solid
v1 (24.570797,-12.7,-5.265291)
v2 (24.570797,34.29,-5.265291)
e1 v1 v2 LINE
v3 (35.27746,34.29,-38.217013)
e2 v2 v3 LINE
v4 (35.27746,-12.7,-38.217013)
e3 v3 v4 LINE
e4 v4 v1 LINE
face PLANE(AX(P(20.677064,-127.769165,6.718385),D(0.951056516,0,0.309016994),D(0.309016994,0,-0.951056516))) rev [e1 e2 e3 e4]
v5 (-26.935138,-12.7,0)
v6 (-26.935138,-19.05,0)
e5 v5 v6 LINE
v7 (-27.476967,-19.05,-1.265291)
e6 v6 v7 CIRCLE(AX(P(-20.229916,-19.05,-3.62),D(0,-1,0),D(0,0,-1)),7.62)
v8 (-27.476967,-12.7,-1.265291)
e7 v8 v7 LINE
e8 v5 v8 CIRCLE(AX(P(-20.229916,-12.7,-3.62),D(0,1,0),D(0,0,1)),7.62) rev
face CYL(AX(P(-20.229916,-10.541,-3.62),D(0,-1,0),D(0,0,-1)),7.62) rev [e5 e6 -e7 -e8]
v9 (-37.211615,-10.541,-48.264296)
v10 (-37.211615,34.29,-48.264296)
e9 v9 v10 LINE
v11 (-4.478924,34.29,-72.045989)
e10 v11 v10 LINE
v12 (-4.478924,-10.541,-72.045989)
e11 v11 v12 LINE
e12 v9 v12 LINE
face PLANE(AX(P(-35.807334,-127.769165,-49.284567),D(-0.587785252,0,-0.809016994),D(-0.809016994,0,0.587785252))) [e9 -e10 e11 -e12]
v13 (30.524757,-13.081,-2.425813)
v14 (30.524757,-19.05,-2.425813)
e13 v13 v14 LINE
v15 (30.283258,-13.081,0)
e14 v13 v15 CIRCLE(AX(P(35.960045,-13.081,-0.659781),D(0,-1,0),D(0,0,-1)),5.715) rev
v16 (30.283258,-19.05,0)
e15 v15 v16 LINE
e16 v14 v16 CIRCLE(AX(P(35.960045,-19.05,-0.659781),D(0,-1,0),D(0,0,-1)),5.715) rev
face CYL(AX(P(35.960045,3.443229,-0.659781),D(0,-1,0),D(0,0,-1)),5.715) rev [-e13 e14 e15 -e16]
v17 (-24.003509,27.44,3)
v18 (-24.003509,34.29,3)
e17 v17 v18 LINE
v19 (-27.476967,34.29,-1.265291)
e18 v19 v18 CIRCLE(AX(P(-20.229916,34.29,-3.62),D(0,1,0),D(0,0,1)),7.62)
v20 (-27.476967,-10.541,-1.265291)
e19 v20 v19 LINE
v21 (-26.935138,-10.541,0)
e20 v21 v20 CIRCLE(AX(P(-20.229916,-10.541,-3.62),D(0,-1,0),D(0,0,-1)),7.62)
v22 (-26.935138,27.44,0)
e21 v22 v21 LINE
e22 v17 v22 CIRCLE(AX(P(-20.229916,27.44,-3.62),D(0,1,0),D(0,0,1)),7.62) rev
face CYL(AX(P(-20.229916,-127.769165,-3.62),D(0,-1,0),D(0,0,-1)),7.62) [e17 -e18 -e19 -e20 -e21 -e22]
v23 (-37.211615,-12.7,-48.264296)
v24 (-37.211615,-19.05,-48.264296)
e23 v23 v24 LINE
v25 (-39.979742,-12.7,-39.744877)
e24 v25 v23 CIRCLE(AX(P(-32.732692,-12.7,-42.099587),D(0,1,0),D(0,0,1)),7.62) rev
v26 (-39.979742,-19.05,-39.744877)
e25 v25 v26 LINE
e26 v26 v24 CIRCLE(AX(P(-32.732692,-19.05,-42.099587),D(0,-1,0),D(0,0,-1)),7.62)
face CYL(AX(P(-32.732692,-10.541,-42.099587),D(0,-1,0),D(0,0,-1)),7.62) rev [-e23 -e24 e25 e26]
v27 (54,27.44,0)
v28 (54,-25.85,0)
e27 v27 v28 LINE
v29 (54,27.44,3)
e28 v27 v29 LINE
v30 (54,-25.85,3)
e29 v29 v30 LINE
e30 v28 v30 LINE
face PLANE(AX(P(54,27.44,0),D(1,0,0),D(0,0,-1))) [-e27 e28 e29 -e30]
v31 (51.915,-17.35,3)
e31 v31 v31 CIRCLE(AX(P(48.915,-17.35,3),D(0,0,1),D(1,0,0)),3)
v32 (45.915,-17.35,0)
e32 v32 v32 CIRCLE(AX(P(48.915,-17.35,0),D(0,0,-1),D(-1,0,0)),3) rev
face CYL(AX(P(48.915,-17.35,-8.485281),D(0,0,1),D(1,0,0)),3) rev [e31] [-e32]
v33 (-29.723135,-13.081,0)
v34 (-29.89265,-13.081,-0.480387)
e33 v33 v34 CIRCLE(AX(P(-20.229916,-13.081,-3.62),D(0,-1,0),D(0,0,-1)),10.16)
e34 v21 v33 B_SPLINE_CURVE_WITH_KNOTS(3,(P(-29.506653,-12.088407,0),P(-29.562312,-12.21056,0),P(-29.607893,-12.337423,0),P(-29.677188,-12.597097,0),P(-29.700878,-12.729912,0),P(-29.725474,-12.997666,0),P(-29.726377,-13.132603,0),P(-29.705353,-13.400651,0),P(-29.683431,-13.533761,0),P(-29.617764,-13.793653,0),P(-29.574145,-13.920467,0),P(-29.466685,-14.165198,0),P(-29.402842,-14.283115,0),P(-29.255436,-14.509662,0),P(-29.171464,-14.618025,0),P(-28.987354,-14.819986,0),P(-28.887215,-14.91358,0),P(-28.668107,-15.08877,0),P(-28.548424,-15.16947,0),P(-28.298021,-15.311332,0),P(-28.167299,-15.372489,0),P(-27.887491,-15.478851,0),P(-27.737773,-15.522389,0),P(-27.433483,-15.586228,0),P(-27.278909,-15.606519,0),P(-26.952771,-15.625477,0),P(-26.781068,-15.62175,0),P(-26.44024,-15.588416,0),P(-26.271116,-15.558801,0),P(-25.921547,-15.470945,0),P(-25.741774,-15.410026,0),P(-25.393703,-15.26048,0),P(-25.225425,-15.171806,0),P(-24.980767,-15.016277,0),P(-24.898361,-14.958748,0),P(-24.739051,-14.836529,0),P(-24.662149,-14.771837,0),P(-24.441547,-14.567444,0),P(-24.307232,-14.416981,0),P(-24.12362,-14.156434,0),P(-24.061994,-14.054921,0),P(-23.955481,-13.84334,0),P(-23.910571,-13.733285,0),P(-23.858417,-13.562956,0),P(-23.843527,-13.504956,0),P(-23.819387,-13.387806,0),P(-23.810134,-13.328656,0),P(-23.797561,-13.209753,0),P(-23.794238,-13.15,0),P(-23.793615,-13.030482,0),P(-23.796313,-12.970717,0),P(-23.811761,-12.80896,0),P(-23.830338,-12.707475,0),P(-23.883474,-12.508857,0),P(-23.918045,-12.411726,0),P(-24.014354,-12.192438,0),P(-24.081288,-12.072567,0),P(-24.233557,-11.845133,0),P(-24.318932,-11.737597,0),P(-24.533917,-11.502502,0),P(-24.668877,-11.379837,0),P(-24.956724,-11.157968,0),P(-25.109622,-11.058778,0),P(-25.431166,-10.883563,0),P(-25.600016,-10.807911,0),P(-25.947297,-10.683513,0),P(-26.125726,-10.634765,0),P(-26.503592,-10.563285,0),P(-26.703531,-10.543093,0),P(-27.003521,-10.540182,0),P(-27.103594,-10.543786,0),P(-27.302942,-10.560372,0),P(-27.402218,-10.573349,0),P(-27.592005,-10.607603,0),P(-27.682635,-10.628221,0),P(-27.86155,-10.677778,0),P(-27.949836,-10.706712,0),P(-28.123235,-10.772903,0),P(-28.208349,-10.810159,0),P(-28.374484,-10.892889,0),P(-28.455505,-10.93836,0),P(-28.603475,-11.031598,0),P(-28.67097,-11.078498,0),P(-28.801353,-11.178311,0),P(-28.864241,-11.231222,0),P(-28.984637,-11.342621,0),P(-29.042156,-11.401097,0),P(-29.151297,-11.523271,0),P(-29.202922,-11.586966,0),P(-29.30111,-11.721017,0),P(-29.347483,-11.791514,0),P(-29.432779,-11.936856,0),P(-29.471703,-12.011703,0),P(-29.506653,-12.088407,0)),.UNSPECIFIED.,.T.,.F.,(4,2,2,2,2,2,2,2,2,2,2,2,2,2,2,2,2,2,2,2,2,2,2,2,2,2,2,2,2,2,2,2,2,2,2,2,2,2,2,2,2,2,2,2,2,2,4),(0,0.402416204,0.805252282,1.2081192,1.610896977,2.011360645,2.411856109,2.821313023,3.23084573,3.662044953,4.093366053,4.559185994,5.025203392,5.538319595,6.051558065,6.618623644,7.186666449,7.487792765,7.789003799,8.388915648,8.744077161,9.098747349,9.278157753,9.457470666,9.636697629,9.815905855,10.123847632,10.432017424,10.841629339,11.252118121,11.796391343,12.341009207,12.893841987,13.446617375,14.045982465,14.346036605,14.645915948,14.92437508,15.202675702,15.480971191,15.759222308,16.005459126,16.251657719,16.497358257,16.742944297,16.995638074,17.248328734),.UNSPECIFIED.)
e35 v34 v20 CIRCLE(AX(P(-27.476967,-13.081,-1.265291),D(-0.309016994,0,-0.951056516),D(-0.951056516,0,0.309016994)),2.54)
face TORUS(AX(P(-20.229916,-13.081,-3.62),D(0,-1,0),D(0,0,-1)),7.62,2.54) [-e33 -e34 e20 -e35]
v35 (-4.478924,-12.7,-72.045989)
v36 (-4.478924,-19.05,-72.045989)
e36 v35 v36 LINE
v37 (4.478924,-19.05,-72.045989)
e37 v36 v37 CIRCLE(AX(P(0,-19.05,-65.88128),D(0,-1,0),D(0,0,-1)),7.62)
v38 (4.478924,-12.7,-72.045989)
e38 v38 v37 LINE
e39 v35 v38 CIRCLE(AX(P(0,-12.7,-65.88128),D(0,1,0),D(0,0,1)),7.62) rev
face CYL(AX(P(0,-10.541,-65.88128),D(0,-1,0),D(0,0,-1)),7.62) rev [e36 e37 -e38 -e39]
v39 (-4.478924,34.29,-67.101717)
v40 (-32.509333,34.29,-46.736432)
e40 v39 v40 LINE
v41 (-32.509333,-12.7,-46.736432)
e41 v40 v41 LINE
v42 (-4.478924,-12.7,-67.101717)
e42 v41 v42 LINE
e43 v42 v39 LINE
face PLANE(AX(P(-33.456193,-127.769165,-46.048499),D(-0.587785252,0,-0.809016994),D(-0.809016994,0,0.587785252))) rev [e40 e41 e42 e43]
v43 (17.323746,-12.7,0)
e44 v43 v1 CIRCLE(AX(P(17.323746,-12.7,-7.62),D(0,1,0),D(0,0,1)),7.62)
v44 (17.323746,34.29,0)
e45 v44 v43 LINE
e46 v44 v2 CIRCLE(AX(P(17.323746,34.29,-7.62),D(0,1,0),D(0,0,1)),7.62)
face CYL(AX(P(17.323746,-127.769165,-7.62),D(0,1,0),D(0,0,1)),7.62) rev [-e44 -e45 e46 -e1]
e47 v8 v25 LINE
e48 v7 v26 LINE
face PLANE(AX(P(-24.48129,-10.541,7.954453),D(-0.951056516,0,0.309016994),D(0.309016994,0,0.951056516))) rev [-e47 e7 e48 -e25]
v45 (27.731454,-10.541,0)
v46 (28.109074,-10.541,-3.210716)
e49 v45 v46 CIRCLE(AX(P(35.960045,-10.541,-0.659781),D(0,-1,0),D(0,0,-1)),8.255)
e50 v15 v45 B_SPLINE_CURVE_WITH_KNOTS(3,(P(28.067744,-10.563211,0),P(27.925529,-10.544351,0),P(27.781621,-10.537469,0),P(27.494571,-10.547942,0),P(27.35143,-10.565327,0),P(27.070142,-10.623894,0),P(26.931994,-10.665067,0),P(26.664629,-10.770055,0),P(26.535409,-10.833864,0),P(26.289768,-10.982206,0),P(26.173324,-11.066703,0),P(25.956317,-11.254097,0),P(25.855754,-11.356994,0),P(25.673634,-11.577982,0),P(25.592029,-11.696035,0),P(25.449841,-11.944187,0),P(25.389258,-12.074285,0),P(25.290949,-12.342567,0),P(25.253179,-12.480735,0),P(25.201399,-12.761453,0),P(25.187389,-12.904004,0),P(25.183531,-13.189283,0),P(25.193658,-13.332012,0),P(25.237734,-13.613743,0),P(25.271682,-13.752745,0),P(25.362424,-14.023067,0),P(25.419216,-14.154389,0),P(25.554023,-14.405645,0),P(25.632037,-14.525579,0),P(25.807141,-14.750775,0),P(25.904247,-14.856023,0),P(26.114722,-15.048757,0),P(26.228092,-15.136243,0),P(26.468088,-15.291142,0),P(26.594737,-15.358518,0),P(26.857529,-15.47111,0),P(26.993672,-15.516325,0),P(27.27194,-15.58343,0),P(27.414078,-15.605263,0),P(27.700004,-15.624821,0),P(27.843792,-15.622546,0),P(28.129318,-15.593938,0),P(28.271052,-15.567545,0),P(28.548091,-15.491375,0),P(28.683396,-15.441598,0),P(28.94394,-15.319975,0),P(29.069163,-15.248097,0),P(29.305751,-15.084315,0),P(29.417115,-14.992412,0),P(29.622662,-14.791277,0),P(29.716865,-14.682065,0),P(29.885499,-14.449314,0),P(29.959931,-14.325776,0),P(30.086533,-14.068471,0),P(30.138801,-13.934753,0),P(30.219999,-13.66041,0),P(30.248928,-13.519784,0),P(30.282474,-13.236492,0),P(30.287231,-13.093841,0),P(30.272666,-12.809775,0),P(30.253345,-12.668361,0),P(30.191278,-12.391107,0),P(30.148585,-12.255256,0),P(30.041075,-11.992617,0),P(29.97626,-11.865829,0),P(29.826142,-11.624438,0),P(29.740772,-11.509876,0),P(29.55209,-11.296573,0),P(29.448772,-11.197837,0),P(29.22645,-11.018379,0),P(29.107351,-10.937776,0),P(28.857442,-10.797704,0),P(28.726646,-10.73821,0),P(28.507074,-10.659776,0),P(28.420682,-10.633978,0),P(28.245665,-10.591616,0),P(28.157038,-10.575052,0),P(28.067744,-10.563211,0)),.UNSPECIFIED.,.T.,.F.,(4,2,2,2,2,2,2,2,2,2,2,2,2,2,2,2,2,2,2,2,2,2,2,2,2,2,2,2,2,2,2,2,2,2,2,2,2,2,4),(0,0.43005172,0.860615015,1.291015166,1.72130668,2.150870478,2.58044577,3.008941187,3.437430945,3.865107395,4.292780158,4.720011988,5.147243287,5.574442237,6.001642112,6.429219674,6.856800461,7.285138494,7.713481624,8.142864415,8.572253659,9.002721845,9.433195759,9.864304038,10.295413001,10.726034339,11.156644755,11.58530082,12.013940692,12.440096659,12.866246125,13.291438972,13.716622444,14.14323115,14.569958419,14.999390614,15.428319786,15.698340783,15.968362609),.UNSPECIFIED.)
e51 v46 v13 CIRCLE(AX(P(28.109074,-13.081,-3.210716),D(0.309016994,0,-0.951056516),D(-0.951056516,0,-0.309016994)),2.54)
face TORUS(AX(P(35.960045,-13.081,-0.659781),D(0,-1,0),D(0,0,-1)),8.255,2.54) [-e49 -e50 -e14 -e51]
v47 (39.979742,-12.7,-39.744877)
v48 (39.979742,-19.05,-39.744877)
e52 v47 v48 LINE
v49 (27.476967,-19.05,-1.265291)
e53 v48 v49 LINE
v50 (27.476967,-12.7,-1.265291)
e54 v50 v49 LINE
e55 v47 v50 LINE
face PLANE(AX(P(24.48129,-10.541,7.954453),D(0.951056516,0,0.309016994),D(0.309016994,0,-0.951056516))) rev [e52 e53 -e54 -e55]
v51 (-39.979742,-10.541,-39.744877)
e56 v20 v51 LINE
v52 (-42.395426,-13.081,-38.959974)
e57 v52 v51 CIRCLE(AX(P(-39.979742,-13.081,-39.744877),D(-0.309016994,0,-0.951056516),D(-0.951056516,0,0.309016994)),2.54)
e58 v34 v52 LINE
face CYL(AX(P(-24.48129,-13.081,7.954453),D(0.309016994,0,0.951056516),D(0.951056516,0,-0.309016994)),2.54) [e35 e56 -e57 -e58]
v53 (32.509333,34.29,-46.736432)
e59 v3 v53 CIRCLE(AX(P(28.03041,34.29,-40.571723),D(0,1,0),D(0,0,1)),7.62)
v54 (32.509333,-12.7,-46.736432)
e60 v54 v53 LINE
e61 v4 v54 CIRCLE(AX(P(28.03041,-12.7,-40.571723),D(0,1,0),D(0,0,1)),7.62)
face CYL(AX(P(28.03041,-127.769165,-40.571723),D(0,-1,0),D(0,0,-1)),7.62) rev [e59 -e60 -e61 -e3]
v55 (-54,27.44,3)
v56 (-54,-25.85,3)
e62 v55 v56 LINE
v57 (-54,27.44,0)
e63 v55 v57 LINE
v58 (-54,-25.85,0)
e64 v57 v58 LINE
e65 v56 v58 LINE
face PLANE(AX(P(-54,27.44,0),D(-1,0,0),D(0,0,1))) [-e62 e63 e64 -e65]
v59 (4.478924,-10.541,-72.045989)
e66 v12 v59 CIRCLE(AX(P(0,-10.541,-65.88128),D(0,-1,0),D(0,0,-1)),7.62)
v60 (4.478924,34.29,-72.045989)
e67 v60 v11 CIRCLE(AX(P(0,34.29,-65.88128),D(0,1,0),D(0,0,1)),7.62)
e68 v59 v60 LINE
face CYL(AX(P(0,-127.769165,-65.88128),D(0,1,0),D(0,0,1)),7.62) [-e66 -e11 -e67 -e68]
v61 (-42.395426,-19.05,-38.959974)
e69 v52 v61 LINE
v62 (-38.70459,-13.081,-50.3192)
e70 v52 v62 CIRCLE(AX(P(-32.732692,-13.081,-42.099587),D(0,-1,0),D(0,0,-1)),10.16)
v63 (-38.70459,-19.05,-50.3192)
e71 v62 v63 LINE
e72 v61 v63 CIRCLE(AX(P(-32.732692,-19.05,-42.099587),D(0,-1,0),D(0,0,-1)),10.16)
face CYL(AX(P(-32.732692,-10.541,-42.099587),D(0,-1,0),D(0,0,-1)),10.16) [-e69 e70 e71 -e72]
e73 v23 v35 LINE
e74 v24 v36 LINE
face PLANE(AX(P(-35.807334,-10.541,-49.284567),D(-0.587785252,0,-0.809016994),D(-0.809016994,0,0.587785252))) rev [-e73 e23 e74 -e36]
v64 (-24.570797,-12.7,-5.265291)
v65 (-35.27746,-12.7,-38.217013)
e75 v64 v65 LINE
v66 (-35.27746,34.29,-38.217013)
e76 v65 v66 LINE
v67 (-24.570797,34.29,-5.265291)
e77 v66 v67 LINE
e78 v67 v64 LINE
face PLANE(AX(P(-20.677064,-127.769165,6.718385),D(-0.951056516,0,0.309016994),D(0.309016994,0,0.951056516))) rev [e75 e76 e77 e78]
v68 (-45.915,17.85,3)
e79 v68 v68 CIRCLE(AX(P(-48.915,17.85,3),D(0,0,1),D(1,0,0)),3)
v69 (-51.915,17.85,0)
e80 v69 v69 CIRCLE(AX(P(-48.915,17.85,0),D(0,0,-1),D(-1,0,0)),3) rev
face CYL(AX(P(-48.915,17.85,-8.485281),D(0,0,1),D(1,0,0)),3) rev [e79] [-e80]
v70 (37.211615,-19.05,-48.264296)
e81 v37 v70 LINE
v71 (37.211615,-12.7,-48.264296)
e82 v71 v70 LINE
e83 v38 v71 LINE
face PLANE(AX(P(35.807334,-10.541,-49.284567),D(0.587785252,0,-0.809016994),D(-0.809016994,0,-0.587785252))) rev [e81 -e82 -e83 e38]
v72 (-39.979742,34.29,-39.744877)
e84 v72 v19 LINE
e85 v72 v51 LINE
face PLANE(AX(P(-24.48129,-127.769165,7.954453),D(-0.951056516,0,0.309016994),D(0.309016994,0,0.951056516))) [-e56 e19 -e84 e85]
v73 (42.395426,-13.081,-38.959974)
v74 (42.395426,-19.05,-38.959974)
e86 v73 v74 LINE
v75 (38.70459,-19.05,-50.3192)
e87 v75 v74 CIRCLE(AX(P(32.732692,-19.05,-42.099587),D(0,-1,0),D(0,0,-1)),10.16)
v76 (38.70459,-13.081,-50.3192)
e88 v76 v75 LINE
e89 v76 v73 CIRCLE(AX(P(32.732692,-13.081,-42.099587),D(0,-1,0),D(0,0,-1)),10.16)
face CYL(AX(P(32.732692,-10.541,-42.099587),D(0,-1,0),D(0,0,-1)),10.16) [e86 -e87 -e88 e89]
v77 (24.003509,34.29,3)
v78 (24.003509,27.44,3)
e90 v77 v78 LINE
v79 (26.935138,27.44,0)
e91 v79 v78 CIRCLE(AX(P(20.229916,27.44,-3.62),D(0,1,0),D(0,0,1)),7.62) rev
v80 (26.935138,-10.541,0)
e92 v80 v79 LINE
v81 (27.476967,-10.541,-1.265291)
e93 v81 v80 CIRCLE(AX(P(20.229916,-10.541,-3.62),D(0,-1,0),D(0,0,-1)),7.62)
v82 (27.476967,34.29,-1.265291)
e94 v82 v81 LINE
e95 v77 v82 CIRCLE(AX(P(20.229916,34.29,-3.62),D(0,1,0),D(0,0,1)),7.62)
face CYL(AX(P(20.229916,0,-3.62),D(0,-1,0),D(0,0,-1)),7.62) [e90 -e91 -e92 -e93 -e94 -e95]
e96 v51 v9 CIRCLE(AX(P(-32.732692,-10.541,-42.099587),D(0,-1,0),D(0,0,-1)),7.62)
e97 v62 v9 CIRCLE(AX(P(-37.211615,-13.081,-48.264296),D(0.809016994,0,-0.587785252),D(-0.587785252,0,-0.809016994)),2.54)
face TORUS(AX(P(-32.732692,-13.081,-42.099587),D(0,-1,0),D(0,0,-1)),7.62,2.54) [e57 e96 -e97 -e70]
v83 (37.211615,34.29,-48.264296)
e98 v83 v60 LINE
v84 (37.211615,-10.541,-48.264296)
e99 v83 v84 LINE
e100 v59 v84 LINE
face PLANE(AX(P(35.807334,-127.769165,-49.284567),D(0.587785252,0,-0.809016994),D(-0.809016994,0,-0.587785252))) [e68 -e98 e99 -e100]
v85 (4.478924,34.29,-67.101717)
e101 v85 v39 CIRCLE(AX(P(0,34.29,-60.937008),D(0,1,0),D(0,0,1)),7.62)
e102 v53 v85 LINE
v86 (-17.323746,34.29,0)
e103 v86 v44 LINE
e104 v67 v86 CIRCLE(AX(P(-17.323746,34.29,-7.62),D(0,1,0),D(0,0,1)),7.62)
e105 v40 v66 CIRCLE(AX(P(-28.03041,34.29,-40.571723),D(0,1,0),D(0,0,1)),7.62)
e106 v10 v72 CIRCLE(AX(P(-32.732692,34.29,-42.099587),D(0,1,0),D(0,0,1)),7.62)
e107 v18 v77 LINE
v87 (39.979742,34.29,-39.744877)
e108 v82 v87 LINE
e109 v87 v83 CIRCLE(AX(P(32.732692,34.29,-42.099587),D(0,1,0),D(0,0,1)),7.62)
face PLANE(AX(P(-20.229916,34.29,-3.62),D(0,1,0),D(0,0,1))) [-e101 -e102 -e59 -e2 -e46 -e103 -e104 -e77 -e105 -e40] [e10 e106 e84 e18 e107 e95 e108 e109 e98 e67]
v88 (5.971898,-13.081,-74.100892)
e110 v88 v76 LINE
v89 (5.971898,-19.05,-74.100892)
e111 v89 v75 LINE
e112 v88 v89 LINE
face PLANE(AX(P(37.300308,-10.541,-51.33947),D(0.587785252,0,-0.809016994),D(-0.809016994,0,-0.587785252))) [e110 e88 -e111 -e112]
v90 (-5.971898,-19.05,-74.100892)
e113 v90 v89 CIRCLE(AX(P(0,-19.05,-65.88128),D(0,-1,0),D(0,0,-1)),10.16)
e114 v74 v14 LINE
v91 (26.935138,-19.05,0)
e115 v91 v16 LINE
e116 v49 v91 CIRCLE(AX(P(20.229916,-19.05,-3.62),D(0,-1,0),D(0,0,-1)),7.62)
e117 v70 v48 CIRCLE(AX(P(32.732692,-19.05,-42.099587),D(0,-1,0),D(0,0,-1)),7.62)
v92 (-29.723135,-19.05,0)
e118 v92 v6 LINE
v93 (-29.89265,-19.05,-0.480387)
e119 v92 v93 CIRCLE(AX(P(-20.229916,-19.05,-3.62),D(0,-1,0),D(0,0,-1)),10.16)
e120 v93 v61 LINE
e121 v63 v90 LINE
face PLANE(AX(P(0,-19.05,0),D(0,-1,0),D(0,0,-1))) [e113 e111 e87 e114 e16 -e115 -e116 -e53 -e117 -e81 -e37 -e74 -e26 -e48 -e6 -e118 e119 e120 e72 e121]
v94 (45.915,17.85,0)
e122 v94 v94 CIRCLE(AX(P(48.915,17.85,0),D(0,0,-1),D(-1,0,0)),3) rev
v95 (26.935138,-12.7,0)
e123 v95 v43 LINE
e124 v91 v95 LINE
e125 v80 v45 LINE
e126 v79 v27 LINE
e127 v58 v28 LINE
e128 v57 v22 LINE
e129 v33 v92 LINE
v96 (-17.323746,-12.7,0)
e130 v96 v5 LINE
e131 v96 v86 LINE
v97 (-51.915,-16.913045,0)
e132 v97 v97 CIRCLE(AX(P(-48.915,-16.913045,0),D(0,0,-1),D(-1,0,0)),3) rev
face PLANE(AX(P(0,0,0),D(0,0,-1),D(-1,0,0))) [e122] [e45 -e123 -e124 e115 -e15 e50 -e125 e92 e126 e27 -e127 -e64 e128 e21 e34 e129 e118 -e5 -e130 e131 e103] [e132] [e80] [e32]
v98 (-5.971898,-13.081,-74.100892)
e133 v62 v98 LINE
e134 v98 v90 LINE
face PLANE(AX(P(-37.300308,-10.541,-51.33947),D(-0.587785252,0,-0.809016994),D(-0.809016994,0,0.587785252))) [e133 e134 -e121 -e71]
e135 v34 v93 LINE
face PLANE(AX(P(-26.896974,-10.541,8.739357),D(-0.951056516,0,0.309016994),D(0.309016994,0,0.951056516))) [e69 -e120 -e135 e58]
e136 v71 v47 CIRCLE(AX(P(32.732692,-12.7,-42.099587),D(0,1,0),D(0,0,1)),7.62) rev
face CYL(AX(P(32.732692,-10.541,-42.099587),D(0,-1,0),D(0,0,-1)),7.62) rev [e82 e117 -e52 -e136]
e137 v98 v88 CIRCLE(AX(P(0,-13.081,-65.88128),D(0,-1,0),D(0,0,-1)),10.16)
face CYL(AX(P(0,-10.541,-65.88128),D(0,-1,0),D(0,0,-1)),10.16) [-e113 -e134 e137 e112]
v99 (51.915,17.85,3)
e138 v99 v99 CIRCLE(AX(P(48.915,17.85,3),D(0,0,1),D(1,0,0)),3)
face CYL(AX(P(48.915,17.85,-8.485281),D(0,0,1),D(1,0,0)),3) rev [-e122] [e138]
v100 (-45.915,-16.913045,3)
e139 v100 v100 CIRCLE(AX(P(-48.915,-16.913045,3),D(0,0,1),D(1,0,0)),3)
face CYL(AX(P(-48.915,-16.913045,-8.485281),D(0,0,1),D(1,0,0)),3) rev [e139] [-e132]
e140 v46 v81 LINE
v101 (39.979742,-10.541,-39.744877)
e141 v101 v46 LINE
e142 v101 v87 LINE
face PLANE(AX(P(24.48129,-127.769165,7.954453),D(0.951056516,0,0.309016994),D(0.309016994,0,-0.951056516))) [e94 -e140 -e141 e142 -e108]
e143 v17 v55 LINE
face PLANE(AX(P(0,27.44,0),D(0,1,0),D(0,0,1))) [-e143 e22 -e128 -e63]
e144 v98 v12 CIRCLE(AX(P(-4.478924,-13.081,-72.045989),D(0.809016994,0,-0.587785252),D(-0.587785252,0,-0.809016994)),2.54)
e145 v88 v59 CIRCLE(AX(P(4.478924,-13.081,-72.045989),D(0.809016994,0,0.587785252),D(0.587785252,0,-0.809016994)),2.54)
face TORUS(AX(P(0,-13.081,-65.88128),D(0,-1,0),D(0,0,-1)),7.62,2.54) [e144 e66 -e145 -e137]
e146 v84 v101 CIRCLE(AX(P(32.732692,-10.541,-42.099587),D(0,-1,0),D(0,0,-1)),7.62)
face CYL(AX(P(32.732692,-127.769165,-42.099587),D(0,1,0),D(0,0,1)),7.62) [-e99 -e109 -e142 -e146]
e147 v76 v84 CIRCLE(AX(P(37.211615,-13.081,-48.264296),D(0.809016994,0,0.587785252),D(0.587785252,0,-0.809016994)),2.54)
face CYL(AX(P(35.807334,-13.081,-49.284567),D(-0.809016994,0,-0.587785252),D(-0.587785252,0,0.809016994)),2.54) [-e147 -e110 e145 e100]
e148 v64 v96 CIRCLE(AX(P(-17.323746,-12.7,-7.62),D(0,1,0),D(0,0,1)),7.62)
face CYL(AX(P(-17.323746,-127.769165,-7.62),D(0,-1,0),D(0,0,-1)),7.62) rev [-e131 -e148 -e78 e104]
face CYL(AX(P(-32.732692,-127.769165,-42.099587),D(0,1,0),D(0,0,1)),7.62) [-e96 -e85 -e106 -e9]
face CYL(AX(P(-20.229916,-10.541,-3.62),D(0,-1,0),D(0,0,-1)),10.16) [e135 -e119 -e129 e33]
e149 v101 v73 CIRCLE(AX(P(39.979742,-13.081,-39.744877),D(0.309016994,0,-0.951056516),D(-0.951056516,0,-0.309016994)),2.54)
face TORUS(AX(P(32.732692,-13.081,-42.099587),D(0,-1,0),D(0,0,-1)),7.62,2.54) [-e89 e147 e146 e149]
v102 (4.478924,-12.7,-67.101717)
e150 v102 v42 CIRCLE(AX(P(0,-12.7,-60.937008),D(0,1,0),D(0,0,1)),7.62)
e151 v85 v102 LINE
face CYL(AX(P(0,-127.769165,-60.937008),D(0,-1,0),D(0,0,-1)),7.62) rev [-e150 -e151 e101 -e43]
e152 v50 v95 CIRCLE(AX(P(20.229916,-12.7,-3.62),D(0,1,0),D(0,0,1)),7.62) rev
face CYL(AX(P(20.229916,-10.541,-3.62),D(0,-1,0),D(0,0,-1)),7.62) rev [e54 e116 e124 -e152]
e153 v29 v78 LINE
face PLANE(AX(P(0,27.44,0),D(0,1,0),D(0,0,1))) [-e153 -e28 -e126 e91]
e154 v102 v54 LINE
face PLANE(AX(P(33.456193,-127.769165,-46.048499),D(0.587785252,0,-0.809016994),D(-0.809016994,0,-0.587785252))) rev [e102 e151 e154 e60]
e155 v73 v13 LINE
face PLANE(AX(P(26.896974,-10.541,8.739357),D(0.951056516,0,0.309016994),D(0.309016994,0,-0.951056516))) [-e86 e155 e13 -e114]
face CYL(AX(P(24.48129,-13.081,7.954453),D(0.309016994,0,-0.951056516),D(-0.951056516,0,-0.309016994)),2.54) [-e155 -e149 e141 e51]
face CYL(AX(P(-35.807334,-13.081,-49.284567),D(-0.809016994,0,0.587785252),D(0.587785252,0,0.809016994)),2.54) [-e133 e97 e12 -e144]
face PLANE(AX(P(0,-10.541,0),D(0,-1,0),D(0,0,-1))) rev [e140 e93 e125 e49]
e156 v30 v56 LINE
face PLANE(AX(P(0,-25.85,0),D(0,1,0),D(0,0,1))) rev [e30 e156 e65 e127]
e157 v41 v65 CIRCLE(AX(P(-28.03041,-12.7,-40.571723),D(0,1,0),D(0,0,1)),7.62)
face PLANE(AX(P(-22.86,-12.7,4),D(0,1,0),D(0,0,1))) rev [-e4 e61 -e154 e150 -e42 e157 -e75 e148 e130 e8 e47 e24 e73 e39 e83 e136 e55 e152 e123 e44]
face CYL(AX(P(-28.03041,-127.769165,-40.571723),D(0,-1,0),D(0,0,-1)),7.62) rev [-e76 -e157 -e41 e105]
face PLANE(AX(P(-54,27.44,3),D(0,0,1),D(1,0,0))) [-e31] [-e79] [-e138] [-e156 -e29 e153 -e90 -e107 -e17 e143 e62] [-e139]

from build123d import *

# Parameters (mm, degrees)
SKETCH1_W                = 45.72
SKETCH1_H                = 25.4
BOSS_EXTRUDE1_DEPTH      = 4
BOSS_EXTRUDE2_DEPTH      = 25.4
FILLET1_R                = 7.62
BOSS_EXTRUDE3_DEPTH      = 5.08
BOSS_EXTRUDE4_DEPTH      = 6.35
BOSS_EXTRUDE4_DEPTH_BACK = 2.159
BOSS_EXTRUDE5_START      = -8.509
BOSS_EXTRUDE5_DEPTH      = 8.509
CUT_EXTRUDE4_DEPTH       = 12.192
FILLET5_R                = 5.715
FILLET6_R                = 2.54
BOSS_EXTRUDE6_DEPTH      = 16.51
BOSS_EXTRUDE7_START      = -40.14
SKETCH23_W               = 108
SKETCH23_H               = 3
BOSS_EXTRUDE7_DEPTH      = 46.49
CUT_EXTRUDE10_DEPTH      = 105.433406107
CUT_EXTRUDE10_DEPTH_BACK = 105.433406107
SKETCH24_W               = 66.644686686
SKETCH24_H               = 9.540314428
SKETCH27_W               = 108
SKETCH27_H               = 3
BOSS_EXTRUDE9_DEPTH      = 6.8
CUT_EXTRUDE11_DEPTH      = 102.682486179
CUT_EXTRUDE11_DEPTH_BACK = 3
SKETCH28_R               = 3


with BuildPart() as part:
    # Sketch1 → Boss-Extrude1 (new body)
    with BuildSketch(Plane.XY):
        Rectangle(SKETCH1_W, SKETCH1_H)
    extrude(amount=BOSS_EXTRUDE1_DEPTH)

    # Sketch2 → Boss-Extrude2 (add)
    with BuildSketch(Plane(origin=(0, 12.7, 0), x_dir=(1, 0, 0), z_dir=(0, 1, 0))):
        Polygon((36.988256983, 43.482303925), (22.86, 0), (22.86, -4), (25.766170112, -4), (41.690539001, 45.01016797), (0, 75.30011757), (-41.690539001, 45.01016797), (-25.766170112, -4), (-22.86, -4), (-22.86, 0), (-36.988256983, 43.482303925), (0, 70.35584566), align=None)
    extrude(amount=-BOSS_EXTRUDE2_DEPTH)

    # Fillet1
    fillet1_edges = [part.edges().sort_by_distance(p)[0] for p in [
        (0, 0, -75.30011757),
        (41.690539001, 0, -45.01016797),
        (25.766170112, 0, 4),
        (36.988256983, 0, -43.482303925),
        (0, 0, -70.35584566),
        (-36.988256983, 0, -43.482303925),
        (-25.766170112, 0, 4),
        (-41.690539001, 0, -45.01016797),
        (-22.86, 0, 0),
        (22.86, 0, 0),
    ]]
    fillet(fillet1_edges, radius=FILLET1_R)

    # Sketch6 → Boss-Extrude3 (add)
    with BuildSketch(Plane(origin=(0, 12.7, 0), x_dir=(1, 0, 0), z_dir=(0, 1, 0))):
        with BuildLine():
            Line((-20.229916049, -4), (20.229916049, -4))
            ThreePointArc((20.229916049, -4), (24.708839671, -2.544709497), (27.476966703, 1.265290503))
            Line((27.476966703, 1.265290503), (39.97974241, 39.744877467))
            ThreePointArc((39.97974241, 39.744877467), (39.97974241, 44.454296461), (37.211615379, 48.264296461))
            Line((37.211615379, 48.264296461), (4.478923622, 72.045989078))
            ThreePointArc((4.478923622, 72.045989078), (0, 73.501279581), (-4.478923622, 72.045989078))
            Line((-4.478923622, 72.045989078), (-37.211615379, 48.264296461))
            ThreePointArc((-37.211615379, 48.264296461), (-39.97974241, 44.454296461), (-39.97974241, 39.744877467))
            Line((-39.97974241, 39.744877467), (-27.476966703, 1.265290503))
            ThreePointArc((-27.476966703, 1.265290503), (-24.708839671, -2.544709497), (-20.229916049, -4))
        make_face()
        with BuildLine():
            Line((24.570796591, 5.265290503), (35.277460392, 38.217013422))
            ThreePointArc((35.277460392, 38.217013422), (35.277460392, 42.926432416), (32.50933336, 46.736432416))
            Line((32.50933336, 46.736432416), (4.478923622, 67.101717168))
            ThreePointArc((4.478923622, 67.101717168), (0, 68.557007671), (-4.478923622, 67.101717168))
            Line((-4.478923622, 67.101717168), (-32.50933336, 46.736432416))
            ThreePointArc((-32.50933336, 46.736432416), (-35.277460392, 42.926432416), (-35.277460392, 38.217013422))
            Line((-35.277460392, 38.217013422), (-24.570796591, 5.265290503))
            ThreePointArc((-24.570796591, 5.265290503), (-21.802669559, 1.455290503), (-17.323745937, 0))
            Line((-17.323745937, 0), (17.323745937, 0))
            ThreePointArc((17.323745937, 0), (21.802669559, 1.455290503), (24.570796591, 5.265290503))
        make_face(mode=Mode.SUBTRACT)
    extrude(amount=BOSS_EXTRUDE3_DEPTH)

    # Sketch8 → Boss-Extrude4 (add, two sides: drawn at the far end of the back side and taken through both)
    with BuildSketch(Plane.XZ.offset(12.7).offset(-BOSS_EXTRUDE4_DEPTH_BACK)):
        with BuildLine():
            Line((5.971898163, -74.100892244), (38.70458992, -50.319199627))
            ThreePointArc((38.70458992, -50.319199627), (42.395425962, -45.239199627), (42.395425962, -38.959974301))
            Line((42.395425962, -38.959974301), (29.892650254, -0.480387337))
            ThreePointArc((29.892650254, -0.480387337), (26.201814212, 4.599612663), (20.229916049, 6.54))
            Line((20.229916049, 6.54), (-20.229916049, 6.54))
            ThreePointArc((-20.229916049, 6.54), (-26.201814212, 4.599612663), (-29.892650254, -0.480387337))
            Line((-29.892650254, -0.480387337), (-42.395425962, -38.959974301))
            ThreePointArc((-42.395425962, -38.959974301), (-42.395425962, -45.239199627), (-38.70458992, -50.319199627))
            Line((-38.70458992, -50.319199627), (-5.971898163, -74.100892244))
            ThreePointArc((-5.971898163, -74.100892244), (0, -76.041279581), (5.971898163, -74.100892244))
        make_face()
        with BuildLine():
            Line((39.97974241, -39.744877467), (27.476966703, -1.265290503))
            ThreePointArc((27.476966703, -1.265290503), (24.708839671, 2.544709497), (20.229916049, 4))
            Line((20.229916049, 4), (-20.229916049, 4))
            ThreePointArc((-20.229916049, 4), (-24.708839671, 2.544709497), (-27.476966703, -1.265290503))
            Line((-27.476966703, -1.265290503), (-39.97974241, -39.744877467))
            ThreePointArc((-39.97974241, -39.744877467), (-39.97974241, -44.454296461), (-37.211615379, -48.264296461))
            Line((-37.211615379, -48.264296461), (-4.478923622, -72.045989078))
            ThreePointArc((-4.478923622, -72.045989078), (0, -73.501279581), (4.478923622, -72.045989078))
            Line((4.478923622, -72.045989078), (37.211615379, -48.264296461))
            ThreePointArc((37.211615379, -48.264296461), (39.97974241, -44.454296461), (39.97974241, -39.744877467))
        make_face(mode=Mode.SUBTRACT)
    extrude(amount=BOSS_EXTRUDE4_DEPTH + BOSS_EXTRUDE4_DEPTH_BACK)

    # Sketch11 → Boss-Extrude5 (add)
    with BuildSketch(Plane.XZ.offset(19.05).offset(BOSS_EXTRUDE5_START)):
        with BuildLine():
            Line((19.948787859, 5.414930333), (27.190045273, 1.56775587))
            Line((27.190045273, 1.56775587), (29.892650254, -0.480387337))
            ThreePointArc((29.892650254, -0.480387337), (26.201814212, 4.599612663), (20.229916049, 6.54))
            Line((20.229916049, 6.54), (19.948787859, 5.414930333))
        make_face()
        with BuildLine():
            ThreePointArc((20.229916049, 6.54), (28.196740294, 7.345392854), (29.892650254, -0.480387337))
            ThreePointArc((29.892650254, -0.480387337), (26.201814212, 4.599612663), (20.229916049, 6.54))
        make_face()
    extrude(amount=BOSS_EXTRUDE5_DEPTH)

    # Sketch12 → Cut-Extrude4 (cut)
    with BuildSketch(Plane.XZ.offset(19.05)):
        with BuildLine():
            ThreePointArc((28.787792432, 0.145862767), (27.450253023, 6.317941272), (21.166935135, 5.682739694))
            ThreePointArc((21.166935135, 5.682739694), (25.637505825, 3.822908801), (28.787792432, 0.145862767))
        make_face()
    extrude(amount=-CUT_EXTRUDE4_DEPTH, mode=Mode.SUBTRACT)

    # Fillet5
    fillet5_edges = [part.edges().sort_by_distance(p)[0] for p in [
        (20.229916049, -14.7955, 6.54),
        (29.892650254, -14.7955, -0.480387337),
    ]]
    fillet(fillet5_edges, radius=FILLET5_R)

    # Fillet6
    # the kernel refuses this fillet: 2.54 mm, written as the material it takes off along each edge
    with BuildSketch(Plane(origin=(32.732691756, -10.541, -42.099586964), x_dir=(0.5877852522924727, 0, -0.8090169943749478), z_dir=(-0.8090169943749478, 0, -0.5877852522924727))) as fillet6_piece_1:
        with BuildLine():
            CenterArc((10.16 - FILLET6_R, FILLET6_R), FILLET6_R, 270, 90)
            Line((10.16 - FILLET6_R, 0), (10.16, 0))
            Line((10.16, 0), (10.16, FILLET6_R))
        make_face()
    revolve(axis=Axis((32.732691756, -10.541, -42.099586964), (0, -1, 0)), revolution_arc=72, mode=Mode.SUBTRACT)
    with BuildSketch(Plane(origin=(5.971898163, -10.541, -74.100892244), x_dir=(0, -1, 0), z_dir=(0.8090169943749487, 0, 0.5877852522924716)), Plane(origin=(-38.70458992, -10.541, -50.319199627), x_dir=(0, -1, 0), z_dir=(0.8090169943749469, 0, -0.5877852522924739)), Plane(origin=(-29.892650254, -10.541, -0.480387337), x_dir=(0, -1, 0), z_dir=(-0.30901699437495056, 0, -0.9510565162951526))) as fillet6_piece_2:
        with BuildLine():
            CenterArc((FILLET6_R, -FILLET6_R), FILLET6_R, 90, 90)
            Line((0, -FILLET6_R), (0, 0))
            Line((0, 0), (FILLET6_R, 0))
        make_face()
    extrude(amount=40.459832097, mode=Mode.SUBTRACT)
    with BuildSketch(Plane(origin=(0, -10.541, -65.881279581), x_dir=(-0.5877852522924719, 0, -0.8090169943749482), z_dir=(-0.8090169943749482, 0, 0.5877852522924719))) as fillet6_piece_3:
        with BuildLine():
            CenterArc((10.16 - FILLET6_R, FILLET6_R), FILLET6_R, 270, 90)
            Line((10.16 - FILLET6_R, 0), (10.16, 0))
            Line((10.16, 0), (10.16, FILLET6_R))
        make_face()
    revolve(axis=Axis((0, -10.541, -65.881279581), (0, -1, 0)), revolution_arc=72, mode=Mode.SUBTRACT)
    with BuildSketch(Plane(origin=(-32.732691756, -10.541, -42.099586964), x_dir=(-0.9510565162951528, 0, 0.3090169943749496), z_dir=(0.3090169943749496, 0, 0.9510565162951528))) as fillet6_piece_4:
        with BuildLine():
            CenterArc((10.16 - FILLET6_R, FILLET6_R), FILLET6_R, 270, 90)
            Line((10.16 - FILLET6_R, 0), (10.16, 0))
            Line((10.16, 0), (10.16, FILLET6_R))
        make_face()
    revolve(axis=Axis((-32.732691756, -10.541, -42.099586964), (0, -1, 0)), revolution_arc=72, mode=Mode.SUBTRACT)
    with BuildSketch(Plane(origin=(-20.229916049, -10.541, -3.62), x_dir=(0, 0, 1), z_dir=(1, 0, 0))) as fillet6_piece_5:
        with BuildLine():
            CenterArc((10.16 - FILLET6_R, FILLET6_R), FILLET6_R, 270, 90)
            Line((10.16 - FILLET6_R, 0), (10.16, 0))
            Line((10.16, 0), (10.16, FILLET6_R))
        make_face()
    revolve(axis=Axis((-20.229916049, -10.541, -3.62), (0, -1, 0)), revolution_arc=72, mode=Mode.SUBTRACT)
    with BuildSketch(Plane(origin=(18.184374257, -10.541, 6.54), x_dir=(0, -1, 0), z_dir=(-1, 0, 0)), Plane(origin=(42.395425962, -10.541, -38.959974301), x_dir=(0, -1, 0), z_dir=(-0.30901699437494484, 0, 0.9510565162951544))) as fillet6_piece_6:
        with BuildLine():
            CenterArc((FILLET6_R, -FILLET6_R), FILLET6_R, 90, 90)
            Line((0, -FILLET6_R), (0, 0))
            Line((0, 0), (FILLET6_R, 0))
        make_face()
    extrude(amount=38.414290306, mode=Mode.SUBTRACT)
    with BuildSketch(Plane(origin=(18.184374257, -10.541, 12.255), x_dir=(0.5526465683039506, 0, -0.8334157249187628), z_dir=(0.8334157249187628, 0, 0.5526465683039506))) as fillet6_piece_7:
        with BuildLine():
            CenterArc((5.715 + FILLET6_R, -FILLET6_R), FILLET6_R, 90, 90)
            Line((5.715 + FILLET6_R, 0), (5.715, 0))
            Line((5.715, 0), (5.715, -FILLET6_R))
        make_face()
    revolve(axis=Axis((18.184374257, -10.541, 12.255), (0, 1, 0)), revolution_arc=33.548768752, mode=Mode.SUBTRACT)
    with BuildSketch(Plane(origin=(35.960045421, -10.541, -0.659781065), x_dir=(-0.9510565162951543, 0, -0.30901699437494495), z_dir=(0.30901699437494495, 0, -0.9510565162951543))) as fillet6_piece_8:
        with BuildLine():
            CenterArc((5.715 + FILLET6_R, -FILLET6_R), FILLET6_R, 90, 90)
            Line((5.715 + FILLET6_R, 0), (5.715, 0))
            Line((5.715, 0), (5.715, -FILLET6_R))
        make_face()
    revolve(axis=Axis((35.960045421, -10.541, -0.659781065), (0, 1, 0)), revolution_arc=33.548768752, mode=Mode.SUBTRACT)
    with BuildSketch(Plane(origin=(24.664153166, -10.541, 2.483203799), x_dir=(-0.5526465683039513, 0, 0.8334157249187624), z_dir=(-0.8334157249187624, 0, -0.5526465683039513))) as fillet6_piece_9:
        with BuildLine():
            CenterArc((6.009996192 - FILLET6_R, -FILLET6_R), FILLET6_R, 0, 90)
            Line((6.009996192 - FILLET6_R, 0), (6.009996192, 0))
            Line((6.009996192, 0), (6.009996192, -FILLET6_R))
        make_face()
    revolve(axis=Axis((24.664153166, -10.541, 2.483203799), (0, 1, 0)), revolution_arc=139.097537505, mode=Mode.SUBTRACT)

    # Sketch15 → Boss-Extrude6 (add)
    with BuildSketch(Plane(origin=(0, 17.78, 0), x_dir=(1, 0, 0), z_dir=(0, 1, 0))):
        with BuildLine():
            Line((-20.229916049, -4), (20.229916049, -4))
            ThreePointArc((20.229916049, -4), (24.708839671, -2.544709497), (27.476966703, 1.265290503))
            Line((27.476966703, 1.265290503), (39.97974241, 39.744877467))
            ThreePointArc((39.97974241, 39.744877467), (39.97974241, 44.454296461), (37.211615379, 48.264296461))
            Line((37.211615379, 48.264296461), (4.478923622, 72.045989078))
            ThreePointArc((4.478923622, 72.045989078), (0, 73.501279581), (-4.478923622, 72.045989078))
            Line((-4.478923622, 72.045989078), (-37.211615379, 48.264296461))
            ThreePointArc((-37.211615379, 48.264296461), (-39.97974241, 44.454296461), (-39.97974241, 39.744877467))
            Line((-39.97974241, 39.744877467), (-27.476966703, 1.265290503))
            ThreePointArc((-27.476966703, 1.265290503), (-24.708839671, -2.544709497), (-20.229916049, -4))
        make_face()
        with BuildLine():
            Line((32.50933336, 46.736432416), (4.478923622, 67.101717168))
            ThreePointArc((4.478923622, 67.101717168), (0, 68.557007671), (-4.478923622, 67.101717168))
            Line((-4.478923622, 67.101717168), (-32.50933336, 46.736432416))
            ThreePointArc((-32.50933336, 46.736432416), (-35.277460392, 42.926432416), (-35.277460392, 38.217013422))
            Line((-35.277460392, 38.217013422), (-24.570796591, 5.265290503))
            ThreePointArc((-24.570796591, 5.265290503), (-21.802669559, 1.455290503), (-17.323745937, 0))
            Line((-17.323745937, 0), (17.323745937, 0))
            ThreePointArc((17.323745937, 0), (21.802669559, 1.455290503), (24.570796591, 5.265290503))
            Line((24.570796591, 5.265290503), (35.277460392, 38.217013422))
            ThreePointArc((35.277460392, 38.217013422), (35.277460392, 42.926432416), (32.50933336, 46.736432416))
        make_face(mode=Mode.SUBTRACT)
    extrude(amount=BOSS_EXTRUDE6_DEPTH)

    # Sketch23 → Boss-Extrude7 (add)
    with BuildSketch(Plane.XZ.offset(12.7).offset(BOSS_EXTRUDE7_START)):
        with Locations((0, 1.5)):
            Rectangle(SKETCH23_W, SKETCH23_H)
    extrude(amount=BOSS_EXTRUDE7_DEPTH)

    # Sketch24 → Cut-Extrude10 (cut, two sides: drawn at the far end of the back side and taken through both)
    with BuildSketch(Plane.XZ.offset(12.7).offset(-CUT_EXTRUDE10_DEPTH_BACK)):
        with Locations((1.37764771, 7.770157214)):
            Rectangle(SKETCH24_W, SKETCH24_H)
    extrude(amount=CUT_EXTRUDE10_DEPTH + CUT_EXTRUDE10_DEPTH_BACK, mode=Mode.SUBTRACT)

    # Sketch27 → Boss-Extrude9 (add)
    with BuildSketch(Plane.XZ.offset(19.05)):
        with Locations((0, 1.5)):
            Rectangle(SKETCH27_W, SKETCH27_H)
    extrude(amount=BOSS_EXTRUDE9_DEPTH)

    # Sketch28 → Cut-Extrude11 (cut, two sides: drawn at the far end of the back side and taken through both)
    with BuildSketch(Plane.XY.offset(3).offset(-CUT_EXTRUDE11_DEPTH_BACK)):
        with Locations((48.915, -17.35)):
            Circle(SKETCH28_R)
        with Locations((48.915, 17.85)):
            Circle(SKETCH28_R)
        with Locations((-48.915, -16.913045034)):
            Circle(SKETCH28_R)
        with Locations((-48.915, 17.85)):
            Circle(SKETCH28_R)
    extrude(amount=CUT_EXTRUDE11_DEPTH + CUT_EXTRUDE11_DEPTH_BACK, mode=Mode.SUBTRACT)


solid = part.part
